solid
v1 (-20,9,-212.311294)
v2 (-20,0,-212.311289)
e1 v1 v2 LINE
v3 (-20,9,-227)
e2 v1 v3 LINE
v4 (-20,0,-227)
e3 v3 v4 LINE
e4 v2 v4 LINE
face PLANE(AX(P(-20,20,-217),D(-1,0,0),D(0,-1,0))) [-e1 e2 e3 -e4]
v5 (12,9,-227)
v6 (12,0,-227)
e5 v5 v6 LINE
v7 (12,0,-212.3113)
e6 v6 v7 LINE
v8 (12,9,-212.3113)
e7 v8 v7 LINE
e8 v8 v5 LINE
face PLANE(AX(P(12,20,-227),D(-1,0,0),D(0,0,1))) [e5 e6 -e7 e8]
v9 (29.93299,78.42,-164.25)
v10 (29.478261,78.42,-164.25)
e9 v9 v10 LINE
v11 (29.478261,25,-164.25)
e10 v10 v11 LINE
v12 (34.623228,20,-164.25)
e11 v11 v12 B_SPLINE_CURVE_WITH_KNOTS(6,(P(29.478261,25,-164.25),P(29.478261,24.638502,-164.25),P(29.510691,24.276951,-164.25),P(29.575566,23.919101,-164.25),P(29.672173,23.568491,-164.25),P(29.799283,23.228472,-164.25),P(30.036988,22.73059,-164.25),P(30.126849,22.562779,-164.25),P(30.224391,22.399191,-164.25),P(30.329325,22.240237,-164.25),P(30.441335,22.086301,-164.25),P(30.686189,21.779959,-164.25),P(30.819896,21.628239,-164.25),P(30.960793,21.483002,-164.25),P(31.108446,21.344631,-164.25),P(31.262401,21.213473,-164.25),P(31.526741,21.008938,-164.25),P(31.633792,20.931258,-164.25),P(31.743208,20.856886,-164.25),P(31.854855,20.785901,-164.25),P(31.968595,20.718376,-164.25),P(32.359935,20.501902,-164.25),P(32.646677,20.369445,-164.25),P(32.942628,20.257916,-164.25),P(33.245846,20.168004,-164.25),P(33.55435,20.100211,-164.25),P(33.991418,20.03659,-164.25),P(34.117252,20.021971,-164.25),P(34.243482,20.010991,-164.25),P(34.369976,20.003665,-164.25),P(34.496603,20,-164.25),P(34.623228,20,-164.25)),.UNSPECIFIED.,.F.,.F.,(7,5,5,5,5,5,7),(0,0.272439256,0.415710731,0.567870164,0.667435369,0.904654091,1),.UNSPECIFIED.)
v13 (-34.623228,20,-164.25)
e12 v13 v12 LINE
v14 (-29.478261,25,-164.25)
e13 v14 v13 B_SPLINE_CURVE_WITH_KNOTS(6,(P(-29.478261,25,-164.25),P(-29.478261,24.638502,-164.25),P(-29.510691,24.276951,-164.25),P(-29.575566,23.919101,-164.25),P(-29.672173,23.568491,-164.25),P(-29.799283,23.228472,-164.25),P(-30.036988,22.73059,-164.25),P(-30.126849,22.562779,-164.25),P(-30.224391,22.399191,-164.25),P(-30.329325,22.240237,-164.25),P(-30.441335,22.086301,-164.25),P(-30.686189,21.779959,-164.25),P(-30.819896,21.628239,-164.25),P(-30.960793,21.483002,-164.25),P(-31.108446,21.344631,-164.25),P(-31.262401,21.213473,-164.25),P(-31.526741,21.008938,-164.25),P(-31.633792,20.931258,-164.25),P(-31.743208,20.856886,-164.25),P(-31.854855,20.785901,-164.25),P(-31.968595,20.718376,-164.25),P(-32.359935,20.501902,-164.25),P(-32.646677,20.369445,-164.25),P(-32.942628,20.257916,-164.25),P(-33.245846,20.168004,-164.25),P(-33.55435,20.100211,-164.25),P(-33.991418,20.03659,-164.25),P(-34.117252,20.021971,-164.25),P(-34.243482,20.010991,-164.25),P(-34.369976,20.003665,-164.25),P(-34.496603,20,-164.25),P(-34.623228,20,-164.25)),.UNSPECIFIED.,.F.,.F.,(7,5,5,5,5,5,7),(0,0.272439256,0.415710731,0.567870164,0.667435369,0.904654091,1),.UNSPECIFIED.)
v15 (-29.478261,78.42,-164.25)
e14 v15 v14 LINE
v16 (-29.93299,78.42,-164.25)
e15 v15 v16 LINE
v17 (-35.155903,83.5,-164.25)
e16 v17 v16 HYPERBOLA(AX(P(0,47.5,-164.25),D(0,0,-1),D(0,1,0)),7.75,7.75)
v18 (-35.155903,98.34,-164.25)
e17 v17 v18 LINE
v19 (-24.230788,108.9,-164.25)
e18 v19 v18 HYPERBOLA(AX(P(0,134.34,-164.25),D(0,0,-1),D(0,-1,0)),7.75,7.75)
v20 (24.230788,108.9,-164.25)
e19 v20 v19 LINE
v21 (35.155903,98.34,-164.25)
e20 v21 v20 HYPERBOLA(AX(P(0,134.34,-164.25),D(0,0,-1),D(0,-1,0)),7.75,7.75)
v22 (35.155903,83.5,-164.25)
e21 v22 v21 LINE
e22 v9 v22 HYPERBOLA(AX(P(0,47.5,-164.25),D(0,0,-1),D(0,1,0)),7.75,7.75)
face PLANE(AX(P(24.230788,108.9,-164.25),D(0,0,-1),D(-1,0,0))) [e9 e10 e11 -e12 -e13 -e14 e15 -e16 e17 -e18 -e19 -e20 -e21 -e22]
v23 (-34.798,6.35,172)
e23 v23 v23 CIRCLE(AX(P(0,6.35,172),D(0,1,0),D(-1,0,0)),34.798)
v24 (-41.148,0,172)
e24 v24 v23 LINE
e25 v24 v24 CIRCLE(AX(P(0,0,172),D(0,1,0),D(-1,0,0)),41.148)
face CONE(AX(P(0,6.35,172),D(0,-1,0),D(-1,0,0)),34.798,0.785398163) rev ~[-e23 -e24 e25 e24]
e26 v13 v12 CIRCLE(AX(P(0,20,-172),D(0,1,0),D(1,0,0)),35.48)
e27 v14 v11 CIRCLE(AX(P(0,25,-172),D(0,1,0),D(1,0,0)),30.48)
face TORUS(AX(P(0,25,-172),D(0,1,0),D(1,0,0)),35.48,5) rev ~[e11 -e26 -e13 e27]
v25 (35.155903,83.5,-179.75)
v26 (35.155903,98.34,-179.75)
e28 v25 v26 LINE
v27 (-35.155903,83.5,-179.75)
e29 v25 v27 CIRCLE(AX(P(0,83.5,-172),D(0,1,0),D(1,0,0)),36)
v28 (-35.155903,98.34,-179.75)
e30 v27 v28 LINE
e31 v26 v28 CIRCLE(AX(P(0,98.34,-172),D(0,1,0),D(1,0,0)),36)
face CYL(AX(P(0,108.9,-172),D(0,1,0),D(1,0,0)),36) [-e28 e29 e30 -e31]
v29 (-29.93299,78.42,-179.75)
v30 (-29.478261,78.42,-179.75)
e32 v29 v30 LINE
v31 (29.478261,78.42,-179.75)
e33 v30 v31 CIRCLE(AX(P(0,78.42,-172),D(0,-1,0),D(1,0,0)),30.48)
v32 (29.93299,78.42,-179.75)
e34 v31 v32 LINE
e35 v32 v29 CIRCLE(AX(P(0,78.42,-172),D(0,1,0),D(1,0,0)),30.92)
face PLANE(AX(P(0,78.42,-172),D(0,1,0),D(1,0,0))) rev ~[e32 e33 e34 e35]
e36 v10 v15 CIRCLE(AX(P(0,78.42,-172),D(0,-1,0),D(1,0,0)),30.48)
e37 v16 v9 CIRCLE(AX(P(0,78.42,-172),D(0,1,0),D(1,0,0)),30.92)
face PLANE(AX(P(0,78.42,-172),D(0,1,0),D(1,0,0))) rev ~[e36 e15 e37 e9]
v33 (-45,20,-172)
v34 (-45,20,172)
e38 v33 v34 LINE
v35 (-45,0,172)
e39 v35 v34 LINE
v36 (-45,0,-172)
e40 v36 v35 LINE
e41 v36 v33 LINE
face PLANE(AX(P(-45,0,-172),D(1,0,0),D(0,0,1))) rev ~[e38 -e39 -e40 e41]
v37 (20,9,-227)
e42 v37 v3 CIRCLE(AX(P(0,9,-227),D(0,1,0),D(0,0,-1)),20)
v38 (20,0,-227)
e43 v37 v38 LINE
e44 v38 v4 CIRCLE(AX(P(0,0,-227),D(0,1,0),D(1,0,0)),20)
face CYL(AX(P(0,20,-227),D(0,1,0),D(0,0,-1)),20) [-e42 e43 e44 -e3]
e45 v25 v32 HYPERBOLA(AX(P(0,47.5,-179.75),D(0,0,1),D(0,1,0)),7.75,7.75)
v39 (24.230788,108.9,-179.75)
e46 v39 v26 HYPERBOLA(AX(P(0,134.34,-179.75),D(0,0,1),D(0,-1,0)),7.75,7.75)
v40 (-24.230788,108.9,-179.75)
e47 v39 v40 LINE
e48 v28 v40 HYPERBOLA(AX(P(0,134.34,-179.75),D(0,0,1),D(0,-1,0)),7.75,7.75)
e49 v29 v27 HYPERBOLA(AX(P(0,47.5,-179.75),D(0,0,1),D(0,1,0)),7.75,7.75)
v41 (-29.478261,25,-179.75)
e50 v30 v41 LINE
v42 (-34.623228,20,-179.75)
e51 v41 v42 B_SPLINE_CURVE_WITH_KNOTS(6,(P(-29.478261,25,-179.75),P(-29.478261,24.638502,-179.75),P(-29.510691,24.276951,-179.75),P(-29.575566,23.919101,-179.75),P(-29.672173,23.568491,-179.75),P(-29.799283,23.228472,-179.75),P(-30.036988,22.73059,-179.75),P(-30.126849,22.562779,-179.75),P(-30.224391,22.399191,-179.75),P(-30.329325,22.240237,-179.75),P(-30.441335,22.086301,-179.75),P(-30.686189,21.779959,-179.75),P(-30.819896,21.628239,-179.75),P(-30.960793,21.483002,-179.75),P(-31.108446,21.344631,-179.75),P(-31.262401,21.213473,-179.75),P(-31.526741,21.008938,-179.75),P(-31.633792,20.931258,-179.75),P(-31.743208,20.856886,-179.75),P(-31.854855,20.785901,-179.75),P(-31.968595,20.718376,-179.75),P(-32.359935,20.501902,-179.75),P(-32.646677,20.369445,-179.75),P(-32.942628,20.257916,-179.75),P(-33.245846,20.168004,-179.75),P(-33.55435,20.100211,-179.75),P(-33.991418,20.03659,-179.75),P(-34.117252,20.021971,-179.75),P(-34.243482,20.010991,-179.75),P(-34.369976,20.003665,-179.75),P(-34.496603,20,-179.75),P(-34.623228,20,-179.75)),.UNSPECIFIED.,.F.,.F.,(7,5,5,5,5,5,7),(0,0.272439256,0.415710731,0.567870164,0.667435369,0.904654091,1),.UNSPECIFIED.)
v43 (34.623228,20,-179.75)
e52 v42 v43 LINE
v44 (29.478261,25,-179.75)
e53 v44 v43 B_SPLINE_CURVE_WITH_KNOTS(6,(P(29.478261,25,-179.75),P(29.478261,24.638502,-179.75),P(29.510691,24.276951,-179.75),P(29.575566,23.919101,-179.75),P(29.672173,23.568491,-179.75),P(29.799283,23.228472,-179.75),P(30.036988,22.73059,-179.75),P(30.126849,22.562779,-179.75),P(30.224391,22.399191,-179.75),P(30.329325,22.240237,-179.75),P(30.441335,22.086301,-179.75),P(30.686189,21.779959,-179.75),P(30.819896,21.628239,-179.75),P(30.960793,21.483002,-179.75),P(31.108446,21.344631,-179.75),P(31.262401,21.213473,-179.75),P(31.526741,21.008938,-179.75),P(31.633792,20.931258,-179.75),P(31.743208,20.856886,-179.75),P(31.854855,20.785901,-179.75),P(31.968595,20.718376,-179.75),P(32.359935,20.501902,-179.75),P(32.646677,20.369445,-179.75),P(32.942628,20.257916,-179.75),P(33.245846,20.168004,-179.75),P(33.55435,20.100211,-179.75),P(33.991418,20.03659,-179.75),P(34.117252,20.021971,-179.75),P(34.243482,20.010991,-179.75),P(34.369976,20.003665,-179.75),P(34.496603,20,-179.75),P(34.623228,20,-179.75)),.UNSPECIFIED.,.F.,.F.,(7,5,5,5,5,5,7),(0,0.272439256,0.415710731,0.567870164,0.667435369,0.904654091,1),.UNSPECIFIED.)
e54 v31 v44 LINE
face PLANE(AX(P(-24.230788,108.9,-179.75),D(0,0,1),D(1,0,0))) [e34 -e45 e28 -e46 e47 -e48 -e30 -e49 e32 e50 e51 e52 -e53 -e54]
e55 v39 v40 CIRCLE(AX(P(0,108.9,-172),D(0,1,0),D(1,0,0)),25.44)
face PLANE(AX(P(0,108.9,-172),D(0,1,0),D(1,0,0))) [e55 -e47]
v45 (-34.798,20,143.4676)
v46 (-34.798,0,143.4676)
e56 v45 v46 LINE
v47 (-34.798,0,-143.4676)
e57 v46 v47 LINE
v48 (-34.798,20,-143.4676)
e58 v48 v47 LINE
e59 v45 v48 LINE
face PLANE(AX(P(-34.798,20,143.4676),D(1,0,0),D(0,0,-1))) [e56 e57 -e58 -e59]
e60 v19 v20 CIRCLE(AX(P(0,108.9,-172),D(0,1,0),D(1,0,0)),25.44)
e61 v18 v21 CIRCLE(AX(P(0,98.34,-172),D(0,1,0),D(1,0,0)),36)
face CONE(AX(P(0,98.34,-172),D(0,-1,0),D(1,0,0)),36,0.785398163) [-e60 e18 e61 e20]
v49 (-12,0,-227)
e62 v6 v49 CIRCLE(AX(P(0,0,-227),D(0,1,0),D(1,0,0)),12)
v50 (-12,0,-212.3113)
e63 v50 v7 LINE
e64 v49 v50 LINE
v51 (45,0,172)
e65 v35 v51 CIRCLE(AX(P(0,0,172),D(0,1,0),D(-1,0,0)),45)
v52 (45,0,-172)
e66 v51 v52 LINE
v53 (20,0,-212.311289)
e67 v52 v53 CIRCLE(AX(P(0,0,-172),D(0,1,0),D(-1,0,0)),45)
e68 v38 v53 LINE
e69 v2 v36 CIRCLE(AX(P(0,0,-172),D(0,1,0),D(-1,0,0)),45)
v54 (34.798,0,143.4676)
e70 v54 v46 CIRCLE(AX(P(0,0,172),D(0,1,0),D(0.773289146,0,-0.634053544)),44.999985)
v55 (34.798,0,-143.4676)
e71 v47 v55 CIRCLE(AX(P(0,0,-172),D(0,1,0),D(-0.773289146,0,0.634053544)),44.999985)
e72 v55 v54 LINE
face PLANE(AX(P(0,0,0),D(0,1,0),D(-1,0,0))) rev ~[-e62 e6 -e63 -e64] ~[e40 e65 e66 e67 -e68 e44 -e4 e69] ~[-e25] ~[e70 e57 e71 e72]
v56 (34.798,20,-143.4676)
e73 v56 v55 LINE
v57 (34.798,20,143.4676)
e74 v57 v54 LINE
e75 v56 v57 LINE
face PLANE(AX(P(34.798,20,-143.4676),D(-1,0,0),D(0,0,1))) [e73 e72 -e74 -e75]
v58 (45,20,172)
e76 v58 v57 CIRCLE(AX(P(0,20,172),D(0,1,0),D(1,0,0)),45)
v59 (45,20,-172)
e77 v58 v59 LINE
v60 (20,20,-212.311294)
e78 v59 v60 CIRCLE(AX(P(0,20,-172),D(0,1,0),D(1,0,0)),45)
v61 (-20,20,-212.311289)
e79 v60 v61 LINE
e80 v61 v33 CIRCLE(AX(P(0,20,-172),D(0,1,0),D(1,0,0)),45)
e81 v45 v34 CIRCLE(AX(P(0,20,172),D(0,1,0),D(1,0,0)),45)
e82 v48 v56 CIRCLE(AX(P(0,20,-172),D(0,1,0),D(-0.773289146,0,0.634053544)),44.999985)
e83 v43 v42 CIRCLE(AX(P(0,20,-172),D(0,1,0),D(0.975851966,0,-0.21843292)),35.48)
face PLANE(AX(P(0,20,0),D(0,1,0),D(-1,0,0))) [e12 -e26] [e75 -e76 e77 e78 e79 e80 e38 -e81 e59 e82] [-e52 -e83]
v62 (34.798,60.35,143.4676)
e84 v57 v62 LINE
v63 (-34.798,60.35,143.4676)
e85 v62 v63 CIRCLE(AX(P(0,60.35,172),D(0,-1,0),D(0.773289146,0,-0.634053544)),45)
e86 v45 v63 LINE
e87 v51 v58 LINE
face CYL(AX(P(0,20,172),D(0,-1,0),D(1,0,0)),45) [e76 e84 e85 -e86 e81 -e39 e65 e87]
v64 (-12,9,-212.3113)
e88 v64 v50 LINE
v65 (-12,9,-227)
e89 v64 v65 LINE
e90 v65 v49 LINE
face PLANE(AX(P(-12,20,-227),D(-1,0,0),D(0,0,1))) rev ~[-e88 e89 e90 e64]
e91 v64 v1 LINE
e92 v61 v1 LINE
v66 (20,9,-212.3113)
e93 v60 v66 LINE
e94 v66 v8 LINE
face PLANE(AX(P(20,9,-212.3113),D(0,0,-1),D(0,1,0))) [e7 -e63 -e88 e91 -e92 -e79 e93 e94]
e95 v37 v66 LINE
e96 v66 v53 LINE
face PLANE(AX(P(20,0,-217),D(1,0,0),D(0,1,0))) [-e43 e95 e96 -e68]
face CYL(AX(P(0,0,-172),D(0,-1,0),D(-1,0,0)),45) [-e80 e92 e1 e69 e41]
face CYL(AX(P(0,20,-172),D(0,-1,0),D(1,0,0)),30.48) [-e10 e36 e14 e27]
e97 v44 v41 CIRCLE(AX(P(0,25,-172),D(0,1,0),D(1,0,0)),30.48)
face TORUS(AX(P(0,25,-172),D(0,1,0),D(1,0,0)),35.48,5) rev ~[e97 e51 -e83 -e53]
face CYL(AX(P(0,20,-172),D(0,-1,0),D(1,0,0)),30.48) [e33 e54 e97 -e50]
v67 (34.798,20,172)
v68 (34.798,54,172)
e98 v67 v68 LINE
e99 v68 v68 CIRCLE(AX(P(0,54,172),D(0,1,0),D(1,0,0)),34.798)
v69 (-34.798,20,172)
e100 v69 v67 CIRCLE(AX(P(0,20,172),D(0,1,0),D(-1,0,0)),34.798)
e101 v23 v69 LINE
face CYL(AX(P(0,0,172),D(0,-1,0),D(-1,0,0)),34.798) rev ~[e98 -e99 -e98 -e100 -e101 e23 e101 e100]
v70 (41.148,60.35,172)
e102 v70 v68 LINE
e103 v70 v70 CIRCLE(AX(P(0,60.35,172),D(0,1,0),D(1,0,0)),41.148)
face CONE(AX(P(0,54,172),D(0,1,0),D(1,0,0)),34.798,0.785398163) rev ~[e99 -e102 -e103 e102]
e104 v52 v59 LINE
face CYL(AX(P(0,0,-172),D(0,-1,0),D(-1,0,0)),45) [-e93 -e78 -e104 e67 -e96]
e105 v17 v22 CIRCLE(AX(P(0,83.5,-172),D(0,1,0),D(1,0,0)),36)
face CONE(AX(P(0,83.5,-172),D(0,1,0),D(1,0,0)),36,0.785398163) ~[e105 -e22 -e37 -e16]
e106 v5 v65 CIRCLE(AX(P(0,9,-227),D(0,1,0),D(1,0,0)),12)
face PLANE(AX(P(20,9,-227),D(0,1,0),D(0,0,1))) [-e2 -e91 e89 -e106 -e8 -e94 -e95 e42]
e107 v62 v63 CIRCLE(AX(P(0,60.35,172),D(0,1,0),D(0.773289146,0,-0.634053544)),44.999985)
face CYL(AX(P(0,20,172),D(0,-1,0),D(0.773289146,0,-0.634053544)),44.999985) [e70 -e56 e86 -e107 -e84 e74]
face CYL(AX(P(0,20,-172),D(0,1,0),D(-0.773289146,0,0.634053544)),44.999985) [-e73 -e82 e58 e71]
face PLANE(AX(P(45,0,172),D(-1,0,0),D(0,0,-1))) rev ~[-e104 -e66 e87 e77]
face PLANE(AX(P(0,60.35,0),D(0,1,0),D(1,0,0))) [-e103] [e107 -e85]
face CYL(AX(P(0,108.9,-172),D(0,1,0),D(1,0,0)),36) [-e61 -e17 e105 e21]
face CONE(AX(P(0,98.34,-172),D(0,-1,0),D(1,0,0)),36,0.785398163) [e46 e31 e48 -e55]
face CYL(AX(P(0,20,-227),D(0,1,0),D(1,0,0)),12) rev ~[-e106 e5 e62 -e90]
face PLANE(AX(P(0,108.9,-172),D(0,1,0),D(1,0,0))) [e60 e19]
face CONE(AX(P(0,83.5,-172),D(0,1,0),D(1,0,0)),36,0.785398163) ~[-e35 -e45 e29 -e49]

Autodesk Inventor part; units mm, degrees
ref_plane "YZ Plane" through (0, 0, 0) normal (1, 0, 0) x (0, 1, 0)
ref_plane "XZ Plane" through (0, 0, 0) normal (0, 1, 0) x (-1, 0, 0)
ref_plane "XY Plane" through (0, 0, 0) normal (0, 0, 1) x (1, 0, 0)
sketch "Boceto1" plane through (0, 0, 0) normal (0, 1, 0) x (-1, 0, 0)
  line L0 (45, 172) -> (-45, 172)
  line L1 (-45, 172) -> (-45, -172)
  line L2 (-45, -172) -> (45, -172)
  line L3 (45, -172) -> (45, 172)
  line L4 (45, 172) -> (-45, -172) construction
  line L5 (-45, 172) -> (45, -172) construction
  circle A0 centre (0, -172) radius 45
  circle A1 centre (0, 172) radius 45
  circle A2 centre (0, 172) radius 34.798
  line L6 (45, 172) -> (-45, 172)
  point P0 (0, 0)
  dimension "d0" = 90
  dimension "d1" = 344
  dimension "d2" = 90
  dimension "d3" = 90
  dimension "d4" = 69.596
extrude "Extrusión1" add sketch "Boceto1" along normal blind 20 contours A1 L0 A2 | L0 A2 A1 | L3 A0 L1 A1 | A2 L0 | A0 L2 | L2 A0 picked at (9.4719, 153.1181)
sketch "Boceto3" plane through (0, 20, 0) normal (0, 1, 0) x (1, 0, 0)
  line L0 (34.798, -172) -> (-34.798, -172) projected
  circle A0 centre (0, -172) radius 34.798
  point P0 (0, 0)
extrude "Extrusión2" cut sketch "Boceto3" against normal blind 20
sketch "Boceto5" plane through (0, 20, 0) normal (0, 1, 0) x (1, 0, 0)
  circle A0 centre (0, -172) radius 34.798 projected
  line L0 (-45, 172) -> (-45, -172) projected
  arc A1 (-45, -172) -> (45, -172) centre (0, -172) ccw projected
  line L1 (45, -172) -> (45, 172) projected
  arc A2 (45, 172) -> (-45, 172) centre (0, 172) ccw projected
  line L2 (34.798, -172) -> (-34.798, 172) construction
  line L3 (-34.798, -172) -> (34.798, 172) construction
  line L4 (-45, 172) -> (-45, -172) projected
  arc A3 (34.798, -143.4676) -> (-34.798, -143.4676) centre (0, -172) ccw
  arc A4 (-34.798, 143.4676) -> (34.798, 143.4676) centre (0, 172) ccw
  line L5 (-34.798, -143.4676) -> (-34.798, 143.4676)
  line L6 (34.798, 143.4676) -> (34.798, -143.4676)
  line L7 (45, -172) -> (45, 172) projected
  point P0 (0, 0)
extrude "Extrusión3" cut sketch "Boceto5" against normal blind 20 contours A3 L5 A4 L6
sketch "Boceto6" plane through (0, 20, 0) normal (0, 1, 0) x (1, 0, 0)
  circle A0 centre (0, -172) radius 34.798 projected
  arc A1 (34.798, -143.4676) -> (-34.798, -143.4676) centre (0, -172) ccw projected
  arc A2 (-45, -172) -> (45, -172) centre (0, -172) ccw projected
  arc A3 (-34.798, 143.4676) -> (34.798, 143.4676) centre (0, 172) ccw projected
  circle A4 centre (0, -172) radius 34.798
  circle A5 centre (0, -172) radius 45
  circle A6 centre (0, 172) radius 45
  point P0 (0, 0)
extrude "Extrusión4" add sketch "Boceto6" along normal blind 40.35 contours A5 A2 A1
chamfer "Chaflán1" distance 6.35 angle 45 2 edges at (-34.798, 60.35, 172) (34.798, 0, 172)
sketch "Boceto7" plane through (0, 20, 0) normal (0, 1, 0) x (1, 0, 0)
  arc A0 (-34.798, -143.4676) -> (-45, -172) centre (0, -172) ccw projected
  line L0 (-34.798, -143.4676) -> (-34.798, 143.4676) projected
  arc A1 (-34.798, 143.4676) -> (34.798, 143.4676) centre (0, 172) ccw projected
  line L1 (34.798, 143.4676) -> (34.798, -143.4676) projected
  arc A2 (45, -172) -> (34.798, -143.4676) centre (0, -172) ccw projected
  line L2 (45, -172) -> (45, 172) projected
  arc A3 (45, 172) -> (-45, 172) centre (0, 172) ccw projected
  line L3 (-45, 172) -> (-45, -172) projected
  circle A4 centre (0, 172) radius 30.48
  point P0 (0, 0)
  dimension "d16" = 60.96
extrude "Extrusión5" add sketch "Boceto7" along normal blind 88.9 contours A4
sketch "Boceto9" plane through (0, 108.9, -172) normal (0, 1, 0) x (1, 0, 0)
  circle A0 centre (0, 0) radius 36
  point P0 (0, -172)
  dimension "d20" = 72
extrude "Extrusión6" add sketch "Boceto9" against normal blind 30.48
chamfer "Chaflán2" distance 10.56 angle 45 1 edges at (-36, 108.9, -172)
chamfer "Chaflán3" distance 5.08 angle 45 1 edges at (-36, 78.42, -172)
fillet "Empalme1" radius 5 1 edges at (-30.48, 20, -172)
sketch "Boceto10" plane through (0, 108.9, -172) normal (0, 1, 0) x (1, 0, 0)
  circle A0 centre (0, 0) radius 25.44 projected
  arc A1 (45, 0) -> (-45, 0) centre (0, 0) ccw projected
  line L0 (44.3276, -7.75) -> (-44.3276, -7.75)
  line L1 (-44.3276, -7.75) -> (-44.3276, 7.75)
  line L2 (-44.3276, 7.75) -> (44.3276, 7.75)
  line L3 (44.3276, 7.75) -> (44.3276, -7.75)
  line L4 (44.3276, -7.75) -> (-44.3276, 7.75) construction
  line L5 (-44.3276, -7.75) -> (44.3276, 7.75) construction
  point P0 (0, -172)
  dimension "d30" = 15.5
extrude "Extrusión7" cut sketch "Boceto10" against normal blind 88.9 contours A0 L0 L2 | A0 L2 L3 L0 | A0 L0 L1 L2
ref_plane "Plano de trabajo1" through (0, 0, -217) normal (0, 0, -1) x (-1, 0, 0)
sketch "Boceto11" plane through (0, 0, -217) normal (0, 0, -1) x (-1, 0, 0)
  line L0 (45, 0) -> (45, 20) projected
  line L1 (-45, 20) -> (45, 20) projected
  line L2 (-45, 20) -> (-45, 0) projected
  line L3 (-45, 0) -> (45, 0) projected
  line L4 (45, 0) -> (-45, 0) projected
  line L5 (-20, 20) -> (20, 20)
  line L6 (20, 20) -> (20, 0)
  line L7 (20, 0) -> (-20, 0)
  line L8 (-20, 0) -> (-20, 20)
  line L9 (-20, 20) -> (20, 0) construction
  line L10 (20, 20) -> (-20, 0) construction
  point P0 (0, 0)
  point P1 (0, 10)
extrude "Extrusión8" add sketch "Boceto11" along normal blind 30 and the other way blind 10 contours L3 L8 L1 L6
sketch "Boceto15" plane through (0, 20, 0) normal (0, 1, 0) x (1, 0, 0)
  arc A0 (-20, 212.3113) -> (-45, 172) centre (0, 172) ccw projected
  line L0 (-45, 172) -> (-45, -172) projected
  arc A1 (-34.798, -143.4676) -> (-45, -172) centre (0, -172) ccw projected
  line L1 (-34.798, -143.4676) -> (-34.798, 143.4676) projected
  arc A2 (-34.798, 143.4676) -> (34.798, 143.4676) centre (0, 172) ccw projected
  line L2 (34.798, 143.4676) -> (34.798, -143.4676) projected
  arc A3 (45, -172) -> (34.798, -143.4676) centre (0, -172) ccw projected
  line L3 (45, -172) -> (45, 172) projected
  arc A4 (45, 172) -> (20, 212.3113) centre (0, 172) ccw projected
  line L4 (20, 212.3113) -> (20, 247) projected
  line L5 (-20, 247) -> (20, 247) projected
  line L6 (-20, 212.3113) -> (-20, 247) projected
  arc A5 (34.6232, 179.75) -> (-34.6232, 179.75) centre (0, 172) ccw projected
  line L7 (-34.6232, 179.75) -> (34.6232, 179.75) projected
  line L8 (34.6232, 164.25) -> (-34.6232, 164.25) projected
  arc A6 (-34.6232, 164.25) -> (34.6232, 164.25) centre (0, 172) ccw projected
  arc A7 (12, 227) -> (-12, 227) centre (0, 227) ccw
  line L9 (12, 227) -> (12, 212.3113)
  line L10 (-12, 227) -> (-12, 212.3113)
  arc A8 (45, 172) -> (20, 212.3113) centre (0, 172) ccw projected
  line L11 (-20, 227) -> (-20, 247)
  line L12 (20, 247) -> (-20, 247) projected
  line L13 (-20, 247) -> (20, 247)
  line L14 (20, 247) -> (20, 227)
  line L15 (-12, 212.3113) -> (12, 212.3113)
  line L16 (-20, 227) -> (-20, 247)
  line L17 (20, 247) -> (0, 247)
  line L18 (-20, 247) -> (0, 247)
  line L19 (-20, 247) -> (-20, 227)
  arc A9 (20, 227) -> (0, 247) centre (0, 227) ccw
  arc A10 (0, 247) -> (-20, 227) centre (0, 227) ccw
  line L20 (20, 212.3113) -> (20, 247) projected
  line L21 (20, 227) -> (20, 247)
  line L22 (20, 247) -> (0, 247)
  point P0 (0, 0)
extrude "Extrusión11" cut sketch "Boceto15" against normal blind 50 contours L6 L5 A10 | L5 L4 A9 | L9 L15 L10 A7
sketch "Boceto16" plane through (20, 0, -212.3113) normal (1, 0, 0) x (0, 0, -1)
  line L0 (14.6887, 0) -> (14.6887, 20) projected
  line L1 (0, 20) -> (14.6887, 20) projected
  line L2 (0, 0) -> (0, 20) projected
  line L3 (0, 0) -> (14.6887, 0) projected
  line L4 (0, 20) -> (38, 20)
  line L5 (38, 20) -> (38, 9)
  line L6 (38, 9) -> (0, 9)
  line L7 (0, 9) -> (0, 20)
  point P0 (-212.3113, 0)
extrude "Extrusión12" cut sketch "Boceto16" against normal blind 50 contours L6 L2 L1 L0 | L0 L4 L5 L6
properties part number "link_v2ipt"
